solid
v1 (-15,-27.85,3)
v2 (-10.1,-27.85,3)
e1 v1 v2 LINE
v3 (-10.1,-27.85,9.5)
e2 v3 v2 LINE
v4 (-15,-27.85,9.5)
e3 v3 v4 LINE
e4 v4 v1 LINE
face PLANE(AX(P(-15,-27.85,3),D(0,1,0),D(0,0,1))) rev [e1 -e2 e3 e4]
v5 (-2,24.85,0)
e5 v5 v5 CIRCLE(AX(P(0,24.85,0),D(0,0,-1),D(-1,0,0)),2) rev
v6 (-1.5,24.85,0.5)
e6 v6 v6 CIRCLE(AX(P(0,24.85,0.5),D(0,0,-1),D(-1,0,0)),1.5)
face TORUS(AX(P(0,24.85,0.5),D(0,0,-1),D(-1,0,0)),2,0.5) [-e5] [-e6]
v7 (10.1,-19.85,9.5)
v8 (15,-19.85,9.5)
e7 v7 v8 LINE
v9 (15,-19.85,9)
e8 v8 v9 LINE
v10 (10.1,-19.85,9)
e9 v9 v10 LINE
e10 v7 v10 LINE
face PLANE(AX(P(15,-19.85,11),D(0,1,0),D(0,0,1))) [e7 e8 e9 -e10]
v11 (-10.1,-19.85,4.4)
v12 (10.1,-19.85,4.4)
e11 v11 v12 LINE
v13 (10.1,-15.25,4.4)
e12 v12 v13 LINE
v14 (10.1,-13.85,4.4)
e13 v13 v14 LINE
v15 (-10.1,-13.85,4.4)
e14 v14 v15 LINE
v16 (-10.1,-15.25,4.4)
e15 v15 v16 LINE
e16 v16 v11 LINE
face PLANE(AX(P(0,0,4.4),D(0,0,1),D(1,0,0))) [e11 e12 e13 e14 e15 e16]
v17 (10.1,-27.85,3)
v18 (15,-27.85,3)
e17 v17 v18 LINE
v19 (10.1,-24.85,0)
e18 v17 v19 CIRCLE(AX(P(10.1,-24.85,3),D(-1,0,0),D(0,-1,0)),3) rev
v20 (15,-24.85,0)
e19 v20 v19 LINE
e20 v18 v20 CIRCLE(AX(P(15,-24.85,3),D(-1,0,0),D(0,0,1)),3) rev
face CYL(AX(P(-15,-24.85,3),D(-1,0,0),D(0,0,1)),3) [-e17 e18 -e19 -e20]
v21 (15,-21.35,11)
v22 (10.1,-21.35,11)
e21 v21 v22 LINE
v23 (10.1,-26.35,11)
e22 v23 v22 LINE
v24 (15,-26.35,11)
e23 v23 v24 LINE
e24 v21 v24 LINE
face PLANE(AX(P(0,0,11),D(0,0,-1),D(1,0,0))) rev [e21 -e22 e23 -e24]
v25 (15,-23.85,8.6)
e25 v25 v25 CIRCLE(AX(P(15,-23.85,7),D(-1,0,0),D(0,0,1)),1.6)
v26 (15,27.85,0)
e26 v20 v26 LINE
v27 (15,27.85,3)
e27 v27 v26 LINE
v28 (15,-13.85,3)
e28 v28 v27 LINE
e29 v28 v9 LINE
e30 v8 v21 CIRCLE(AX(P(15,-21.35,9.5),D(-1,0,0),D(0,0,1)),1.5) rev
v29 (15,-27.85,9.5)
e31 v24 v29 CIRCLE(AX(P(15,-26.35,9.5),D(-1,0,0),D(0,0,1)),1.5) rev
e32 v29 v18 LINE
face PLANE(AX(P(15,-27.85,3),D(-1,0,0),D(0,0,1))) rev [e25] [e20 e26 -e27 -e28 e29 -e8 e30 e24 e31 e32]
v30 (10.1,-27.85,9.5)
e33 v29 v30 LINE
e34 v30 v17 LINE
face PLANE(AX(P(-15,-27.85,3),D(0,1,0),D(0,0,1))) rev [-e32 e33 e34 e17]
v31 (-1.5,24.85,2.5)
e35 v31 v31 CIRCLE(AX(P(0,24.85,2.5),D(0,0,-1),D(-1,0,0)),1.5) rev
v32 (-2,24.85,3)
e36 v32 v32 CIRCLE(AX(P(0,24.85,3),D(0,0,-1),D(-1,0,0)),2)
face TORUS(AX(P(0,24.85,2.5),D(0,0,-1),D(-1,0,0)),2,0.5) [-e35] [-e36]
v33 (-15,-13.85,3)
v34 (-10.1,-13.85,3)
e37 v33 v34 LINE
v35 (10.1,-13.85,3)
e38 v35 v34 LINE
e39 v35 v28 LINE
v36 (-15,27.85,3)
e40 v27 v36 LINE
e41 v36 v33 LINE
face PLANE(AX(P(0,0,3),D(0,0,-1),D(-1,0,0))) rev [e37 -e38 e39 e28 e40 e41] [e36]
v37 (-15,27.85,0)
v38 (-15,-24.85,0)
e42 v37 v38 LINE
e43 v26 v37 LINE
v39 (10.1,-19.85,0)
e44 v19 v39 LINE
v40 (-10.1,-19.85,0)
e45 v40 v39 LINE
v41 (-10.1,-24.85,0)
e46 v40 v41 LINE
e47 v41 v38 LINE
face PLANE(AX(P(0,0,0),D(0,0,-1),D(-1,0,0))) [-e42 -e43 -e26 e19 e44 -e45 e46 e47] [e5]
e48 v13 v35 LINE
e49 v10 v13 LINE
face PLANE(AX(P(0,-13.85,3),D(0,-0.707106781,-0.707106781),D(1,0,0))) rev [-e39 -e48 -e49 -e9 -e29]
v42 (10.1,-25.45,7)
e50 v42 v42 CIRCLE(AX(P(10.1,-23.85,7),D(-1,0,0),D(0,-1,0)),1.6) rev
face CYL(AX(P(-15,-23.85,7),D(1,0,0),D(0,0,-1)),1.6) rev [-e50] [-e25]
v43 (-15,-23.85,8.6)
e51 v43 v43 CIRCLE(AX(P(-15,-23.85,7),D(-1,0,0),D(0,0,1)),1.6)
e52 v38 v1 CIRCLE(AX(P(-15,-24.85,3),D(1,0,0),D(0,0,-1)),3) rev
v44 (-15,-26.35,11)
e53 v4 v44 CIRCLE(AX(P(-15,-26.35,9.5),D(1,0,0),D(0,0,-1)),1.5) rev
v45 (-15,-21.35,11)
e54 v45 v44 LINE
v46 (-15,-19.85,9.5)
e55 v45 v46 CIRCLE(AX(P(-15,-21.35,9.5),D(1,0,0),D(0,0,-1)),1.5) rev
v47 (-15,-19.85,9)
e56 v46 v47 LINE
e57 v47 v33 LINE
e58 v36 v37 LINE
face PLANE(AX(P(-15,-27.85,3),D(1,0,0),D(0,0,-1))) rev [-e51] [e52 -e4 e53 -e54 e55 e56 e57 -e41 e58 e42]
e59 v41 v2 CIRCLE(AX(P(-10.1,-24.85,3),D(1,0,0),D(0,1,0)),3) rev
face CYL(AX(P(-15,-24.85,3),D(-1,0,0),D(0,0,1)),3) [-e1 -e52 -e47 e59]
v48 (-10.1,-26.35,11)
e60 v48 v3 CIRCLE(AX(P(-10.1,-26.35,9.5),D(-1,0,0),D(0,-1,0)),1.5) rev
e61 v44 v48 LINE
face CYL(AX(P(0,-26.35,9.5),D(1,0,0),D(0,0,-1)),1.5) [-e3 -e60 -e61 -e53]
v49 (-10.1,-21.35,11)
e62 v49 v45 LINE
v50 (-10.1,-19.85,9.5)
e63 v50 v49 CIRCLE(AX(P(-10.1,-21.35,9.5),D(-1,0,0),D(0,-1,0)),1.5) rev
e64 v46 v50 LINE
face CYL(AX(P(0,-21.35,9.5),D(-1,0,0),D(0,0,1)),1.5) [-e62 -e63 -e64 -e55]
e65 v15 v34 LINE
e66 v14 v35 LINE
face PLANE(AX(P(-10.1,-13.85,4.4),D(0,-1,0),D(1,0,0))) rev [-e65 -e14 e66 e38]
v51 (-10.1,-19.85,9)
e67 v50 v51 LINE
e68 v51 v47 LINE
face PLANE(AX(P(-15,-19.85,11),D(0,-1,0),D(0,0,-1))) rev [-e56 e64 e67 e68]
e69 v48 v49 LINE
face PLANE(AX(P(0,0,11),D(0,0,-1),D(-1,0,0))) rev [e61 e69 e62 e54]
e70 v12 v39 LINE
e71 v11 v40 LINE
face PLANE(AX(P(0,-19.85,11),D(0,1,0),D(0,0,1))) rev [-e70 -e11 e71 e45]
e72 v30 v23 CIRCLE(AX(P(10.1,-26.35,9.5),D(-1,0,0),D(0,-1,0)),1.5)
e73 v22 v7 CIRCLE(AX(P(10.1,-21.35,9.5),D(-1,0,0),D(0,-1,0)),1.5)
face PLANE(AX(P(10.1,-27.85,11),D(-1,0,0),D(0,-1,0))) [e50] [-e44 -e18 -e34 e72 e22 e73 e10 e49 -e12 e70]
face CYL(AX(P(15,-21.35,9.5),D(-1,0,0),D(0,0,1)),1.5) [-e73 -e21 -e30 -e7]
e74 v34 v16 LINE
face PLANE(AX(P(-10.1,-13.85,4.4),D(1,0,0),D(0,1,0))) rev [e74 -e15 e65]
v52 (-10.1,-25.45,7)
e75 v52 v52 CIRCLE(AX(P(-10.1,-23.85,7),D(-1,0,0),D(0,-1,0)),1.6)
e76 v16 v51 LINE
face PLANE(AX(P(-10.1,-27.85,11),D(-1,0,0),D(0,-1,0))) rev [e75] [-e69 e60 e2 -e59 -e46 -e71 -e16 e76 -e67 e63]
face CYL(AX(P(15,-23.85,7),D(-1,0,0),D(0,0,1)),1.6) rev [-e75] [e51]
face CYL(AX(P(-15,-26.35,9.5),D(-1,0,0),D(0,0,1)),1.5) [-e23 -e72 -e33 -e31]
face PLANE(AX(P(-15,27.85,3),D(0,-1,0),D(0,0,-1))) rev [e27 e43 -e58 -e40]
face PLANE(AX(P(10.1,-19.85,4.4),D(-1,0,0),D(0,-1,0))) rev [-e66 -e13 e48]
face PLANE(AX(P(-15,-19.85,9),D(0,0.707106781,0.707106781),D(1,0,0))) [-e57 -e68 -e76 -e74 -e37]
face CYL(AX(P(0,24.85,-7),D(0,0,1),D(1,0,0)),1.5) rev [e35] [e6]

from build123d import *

# Parameters (mm, degrees)
SKETCH1_W               = 30
SKETCH1_H               = 55.7
BOSS_EXTRUDE1_DEPTH     = 3
SKETCH2_W               = 4.9
SKETCH2_H               = 8
BOSS_EXTRUDE2_DEPTH     = 8
SKETCH3_R               = 1.6
CUT_EXTRUDE1_DEPTH      = 43.386583962
SKETCH4_R               = 1.5
CUT_EXTRUDE2_DEPTH      = 10
FILLET3_R               = 0.5
FILLET4_R               = 3
CUT_EXTRUDE4_DEPTH      = 33.628553446
CUT_EXTRUDE4_DEPTH_BACK = 10
FILLET5_R               = 1.5
CHAMFER1_SIZE           = 6
SKETCH6_W               = 20.2
SKETCH6_H               = 6
BOSS_EXTRUDE3_DEPTH     = 1.4


with BuildPart() as part:
    # Sketch1 → Boss-Extrude1 (new body)
    with BuildSketch(Plane.XY):
        Rectangle(SKETCH1_W, SKETCH1_H)
    extrude(amount=BOSS_EXTRUDE1_DEPTH)

    # Sketch2 → Boss-Extrude2 (add)
    with BuildSketch(Plane.XY.offset(3)):
        with Locations((-12.55, -23.85)):
            Rectangle(SKETCH2_W, SKETCH2_H)
    boss_extrude2 = extrude(amount=BOSS_EXTRUDE2_DEPTH)

    # Sketch3 → Cut-Extrude1 (cut, through all)
    with BuildSketch(Plane.ZY.offset(15)):
        with Locations((7, -23.85)):
            Circle(SKETCH3_R)
    cut_extrude1 = extrude(amount=-CUT_EXTRUDE1_DEPTH, mode=Mode.SUBTRACT)

    # Mirror1: Boss-Extrude2, Cut-Extrude1 across plane
    add(boss_extrude2.mirror(Plane(origin=(0, 0, 0), x_dir=(0, 0, 1), z_dir=(1, 0, 0))))
    add(cut_extrude1.mirror(Plane(origin=(0, 0, 0), x_dir=(0, 0, 1), z_dir=(1, 0, 0))), mode=Mode.SUBTRACT)

    # Sketch4 → Cut-Extrude2 (cut)
    with BuildSketch(Plane.XY.offset(3)):
        with Locations((0, 24.85)):
            Circle(SKETCH4_R)
    extrude(amount=-CUT_EXTRUDE2_DEPTH, mode=Mode.SUBTRACT)

    # Fillet3
    fillet3_edges = [part.edges().sort_by_distance(p)[0] for p in [
        (-1.5, 24.85, 0),
        (-1.5, 24.85, 3),
    ]]
    fillet(fillet3_edges, radius=FILLET3_R)

    # Fillet4
    fillet4_edges = [part.edges().sort_by_distance(p)[0] for p in [
        (0, -27.85, 0),
    ]]
    fillet(fillet4_edges, radius=FILLET4_R - 0.0001)  # a hair under: the kernel refuses the full size

    # Sketch5 → Cut-Extrude4 (cut, two sides: drawn at the far end of the back side and taken through both)
    with BuildSketch(Plane.XY.offset(3).offset(-CUT_EXTRUDE4_DEPTH_BACK)):
        Polygon((10.1, -27.85), (10.1, -19.85), (-10.1, -19.85), (-10.1, -27.85), (-10.1, -30.330641118), (10.1, -30.330641118), align=None)
    extrude(amount=CUT_EXTRUDE4_DEPTH + CUT_EXTRUDE4_DEPTH_BACK, mode=Mode.SUBTRACT)

    # Fillet5
    fillet5_edges = [part.edges().sort_by_distance(p)[0] for p in [
        (-12.55, -27.85, 11),
        (-12.55, -19.85, 11),
        (12.55, -19.85, 11),
        (12.55, -27.85, 11),
    ]]
    fillet(fillet5_edges, radius=FILLET5_R)

    # Chamfer1
    chamfer1_edges = [part.edges().sort_by_distance(p)[0] for p in [
        (-12.55, -19.85, 3),
        (12.55, -19.85, 3),
    ]]
    chamfer(chamfer1_edges, length=CHAMFER1_SIZE)

    # Sketch6 → Boss-Extrude3 (add)
    with BuildSketch(Plane.XY.offset(3)):
        with Locations((0, -16.85)):
            Rectangle(SKETCH6_W, SKETCH6_H)
    extrude(amount=BOSS_EXTRUDE3_DEPTH)


solid = part.part
